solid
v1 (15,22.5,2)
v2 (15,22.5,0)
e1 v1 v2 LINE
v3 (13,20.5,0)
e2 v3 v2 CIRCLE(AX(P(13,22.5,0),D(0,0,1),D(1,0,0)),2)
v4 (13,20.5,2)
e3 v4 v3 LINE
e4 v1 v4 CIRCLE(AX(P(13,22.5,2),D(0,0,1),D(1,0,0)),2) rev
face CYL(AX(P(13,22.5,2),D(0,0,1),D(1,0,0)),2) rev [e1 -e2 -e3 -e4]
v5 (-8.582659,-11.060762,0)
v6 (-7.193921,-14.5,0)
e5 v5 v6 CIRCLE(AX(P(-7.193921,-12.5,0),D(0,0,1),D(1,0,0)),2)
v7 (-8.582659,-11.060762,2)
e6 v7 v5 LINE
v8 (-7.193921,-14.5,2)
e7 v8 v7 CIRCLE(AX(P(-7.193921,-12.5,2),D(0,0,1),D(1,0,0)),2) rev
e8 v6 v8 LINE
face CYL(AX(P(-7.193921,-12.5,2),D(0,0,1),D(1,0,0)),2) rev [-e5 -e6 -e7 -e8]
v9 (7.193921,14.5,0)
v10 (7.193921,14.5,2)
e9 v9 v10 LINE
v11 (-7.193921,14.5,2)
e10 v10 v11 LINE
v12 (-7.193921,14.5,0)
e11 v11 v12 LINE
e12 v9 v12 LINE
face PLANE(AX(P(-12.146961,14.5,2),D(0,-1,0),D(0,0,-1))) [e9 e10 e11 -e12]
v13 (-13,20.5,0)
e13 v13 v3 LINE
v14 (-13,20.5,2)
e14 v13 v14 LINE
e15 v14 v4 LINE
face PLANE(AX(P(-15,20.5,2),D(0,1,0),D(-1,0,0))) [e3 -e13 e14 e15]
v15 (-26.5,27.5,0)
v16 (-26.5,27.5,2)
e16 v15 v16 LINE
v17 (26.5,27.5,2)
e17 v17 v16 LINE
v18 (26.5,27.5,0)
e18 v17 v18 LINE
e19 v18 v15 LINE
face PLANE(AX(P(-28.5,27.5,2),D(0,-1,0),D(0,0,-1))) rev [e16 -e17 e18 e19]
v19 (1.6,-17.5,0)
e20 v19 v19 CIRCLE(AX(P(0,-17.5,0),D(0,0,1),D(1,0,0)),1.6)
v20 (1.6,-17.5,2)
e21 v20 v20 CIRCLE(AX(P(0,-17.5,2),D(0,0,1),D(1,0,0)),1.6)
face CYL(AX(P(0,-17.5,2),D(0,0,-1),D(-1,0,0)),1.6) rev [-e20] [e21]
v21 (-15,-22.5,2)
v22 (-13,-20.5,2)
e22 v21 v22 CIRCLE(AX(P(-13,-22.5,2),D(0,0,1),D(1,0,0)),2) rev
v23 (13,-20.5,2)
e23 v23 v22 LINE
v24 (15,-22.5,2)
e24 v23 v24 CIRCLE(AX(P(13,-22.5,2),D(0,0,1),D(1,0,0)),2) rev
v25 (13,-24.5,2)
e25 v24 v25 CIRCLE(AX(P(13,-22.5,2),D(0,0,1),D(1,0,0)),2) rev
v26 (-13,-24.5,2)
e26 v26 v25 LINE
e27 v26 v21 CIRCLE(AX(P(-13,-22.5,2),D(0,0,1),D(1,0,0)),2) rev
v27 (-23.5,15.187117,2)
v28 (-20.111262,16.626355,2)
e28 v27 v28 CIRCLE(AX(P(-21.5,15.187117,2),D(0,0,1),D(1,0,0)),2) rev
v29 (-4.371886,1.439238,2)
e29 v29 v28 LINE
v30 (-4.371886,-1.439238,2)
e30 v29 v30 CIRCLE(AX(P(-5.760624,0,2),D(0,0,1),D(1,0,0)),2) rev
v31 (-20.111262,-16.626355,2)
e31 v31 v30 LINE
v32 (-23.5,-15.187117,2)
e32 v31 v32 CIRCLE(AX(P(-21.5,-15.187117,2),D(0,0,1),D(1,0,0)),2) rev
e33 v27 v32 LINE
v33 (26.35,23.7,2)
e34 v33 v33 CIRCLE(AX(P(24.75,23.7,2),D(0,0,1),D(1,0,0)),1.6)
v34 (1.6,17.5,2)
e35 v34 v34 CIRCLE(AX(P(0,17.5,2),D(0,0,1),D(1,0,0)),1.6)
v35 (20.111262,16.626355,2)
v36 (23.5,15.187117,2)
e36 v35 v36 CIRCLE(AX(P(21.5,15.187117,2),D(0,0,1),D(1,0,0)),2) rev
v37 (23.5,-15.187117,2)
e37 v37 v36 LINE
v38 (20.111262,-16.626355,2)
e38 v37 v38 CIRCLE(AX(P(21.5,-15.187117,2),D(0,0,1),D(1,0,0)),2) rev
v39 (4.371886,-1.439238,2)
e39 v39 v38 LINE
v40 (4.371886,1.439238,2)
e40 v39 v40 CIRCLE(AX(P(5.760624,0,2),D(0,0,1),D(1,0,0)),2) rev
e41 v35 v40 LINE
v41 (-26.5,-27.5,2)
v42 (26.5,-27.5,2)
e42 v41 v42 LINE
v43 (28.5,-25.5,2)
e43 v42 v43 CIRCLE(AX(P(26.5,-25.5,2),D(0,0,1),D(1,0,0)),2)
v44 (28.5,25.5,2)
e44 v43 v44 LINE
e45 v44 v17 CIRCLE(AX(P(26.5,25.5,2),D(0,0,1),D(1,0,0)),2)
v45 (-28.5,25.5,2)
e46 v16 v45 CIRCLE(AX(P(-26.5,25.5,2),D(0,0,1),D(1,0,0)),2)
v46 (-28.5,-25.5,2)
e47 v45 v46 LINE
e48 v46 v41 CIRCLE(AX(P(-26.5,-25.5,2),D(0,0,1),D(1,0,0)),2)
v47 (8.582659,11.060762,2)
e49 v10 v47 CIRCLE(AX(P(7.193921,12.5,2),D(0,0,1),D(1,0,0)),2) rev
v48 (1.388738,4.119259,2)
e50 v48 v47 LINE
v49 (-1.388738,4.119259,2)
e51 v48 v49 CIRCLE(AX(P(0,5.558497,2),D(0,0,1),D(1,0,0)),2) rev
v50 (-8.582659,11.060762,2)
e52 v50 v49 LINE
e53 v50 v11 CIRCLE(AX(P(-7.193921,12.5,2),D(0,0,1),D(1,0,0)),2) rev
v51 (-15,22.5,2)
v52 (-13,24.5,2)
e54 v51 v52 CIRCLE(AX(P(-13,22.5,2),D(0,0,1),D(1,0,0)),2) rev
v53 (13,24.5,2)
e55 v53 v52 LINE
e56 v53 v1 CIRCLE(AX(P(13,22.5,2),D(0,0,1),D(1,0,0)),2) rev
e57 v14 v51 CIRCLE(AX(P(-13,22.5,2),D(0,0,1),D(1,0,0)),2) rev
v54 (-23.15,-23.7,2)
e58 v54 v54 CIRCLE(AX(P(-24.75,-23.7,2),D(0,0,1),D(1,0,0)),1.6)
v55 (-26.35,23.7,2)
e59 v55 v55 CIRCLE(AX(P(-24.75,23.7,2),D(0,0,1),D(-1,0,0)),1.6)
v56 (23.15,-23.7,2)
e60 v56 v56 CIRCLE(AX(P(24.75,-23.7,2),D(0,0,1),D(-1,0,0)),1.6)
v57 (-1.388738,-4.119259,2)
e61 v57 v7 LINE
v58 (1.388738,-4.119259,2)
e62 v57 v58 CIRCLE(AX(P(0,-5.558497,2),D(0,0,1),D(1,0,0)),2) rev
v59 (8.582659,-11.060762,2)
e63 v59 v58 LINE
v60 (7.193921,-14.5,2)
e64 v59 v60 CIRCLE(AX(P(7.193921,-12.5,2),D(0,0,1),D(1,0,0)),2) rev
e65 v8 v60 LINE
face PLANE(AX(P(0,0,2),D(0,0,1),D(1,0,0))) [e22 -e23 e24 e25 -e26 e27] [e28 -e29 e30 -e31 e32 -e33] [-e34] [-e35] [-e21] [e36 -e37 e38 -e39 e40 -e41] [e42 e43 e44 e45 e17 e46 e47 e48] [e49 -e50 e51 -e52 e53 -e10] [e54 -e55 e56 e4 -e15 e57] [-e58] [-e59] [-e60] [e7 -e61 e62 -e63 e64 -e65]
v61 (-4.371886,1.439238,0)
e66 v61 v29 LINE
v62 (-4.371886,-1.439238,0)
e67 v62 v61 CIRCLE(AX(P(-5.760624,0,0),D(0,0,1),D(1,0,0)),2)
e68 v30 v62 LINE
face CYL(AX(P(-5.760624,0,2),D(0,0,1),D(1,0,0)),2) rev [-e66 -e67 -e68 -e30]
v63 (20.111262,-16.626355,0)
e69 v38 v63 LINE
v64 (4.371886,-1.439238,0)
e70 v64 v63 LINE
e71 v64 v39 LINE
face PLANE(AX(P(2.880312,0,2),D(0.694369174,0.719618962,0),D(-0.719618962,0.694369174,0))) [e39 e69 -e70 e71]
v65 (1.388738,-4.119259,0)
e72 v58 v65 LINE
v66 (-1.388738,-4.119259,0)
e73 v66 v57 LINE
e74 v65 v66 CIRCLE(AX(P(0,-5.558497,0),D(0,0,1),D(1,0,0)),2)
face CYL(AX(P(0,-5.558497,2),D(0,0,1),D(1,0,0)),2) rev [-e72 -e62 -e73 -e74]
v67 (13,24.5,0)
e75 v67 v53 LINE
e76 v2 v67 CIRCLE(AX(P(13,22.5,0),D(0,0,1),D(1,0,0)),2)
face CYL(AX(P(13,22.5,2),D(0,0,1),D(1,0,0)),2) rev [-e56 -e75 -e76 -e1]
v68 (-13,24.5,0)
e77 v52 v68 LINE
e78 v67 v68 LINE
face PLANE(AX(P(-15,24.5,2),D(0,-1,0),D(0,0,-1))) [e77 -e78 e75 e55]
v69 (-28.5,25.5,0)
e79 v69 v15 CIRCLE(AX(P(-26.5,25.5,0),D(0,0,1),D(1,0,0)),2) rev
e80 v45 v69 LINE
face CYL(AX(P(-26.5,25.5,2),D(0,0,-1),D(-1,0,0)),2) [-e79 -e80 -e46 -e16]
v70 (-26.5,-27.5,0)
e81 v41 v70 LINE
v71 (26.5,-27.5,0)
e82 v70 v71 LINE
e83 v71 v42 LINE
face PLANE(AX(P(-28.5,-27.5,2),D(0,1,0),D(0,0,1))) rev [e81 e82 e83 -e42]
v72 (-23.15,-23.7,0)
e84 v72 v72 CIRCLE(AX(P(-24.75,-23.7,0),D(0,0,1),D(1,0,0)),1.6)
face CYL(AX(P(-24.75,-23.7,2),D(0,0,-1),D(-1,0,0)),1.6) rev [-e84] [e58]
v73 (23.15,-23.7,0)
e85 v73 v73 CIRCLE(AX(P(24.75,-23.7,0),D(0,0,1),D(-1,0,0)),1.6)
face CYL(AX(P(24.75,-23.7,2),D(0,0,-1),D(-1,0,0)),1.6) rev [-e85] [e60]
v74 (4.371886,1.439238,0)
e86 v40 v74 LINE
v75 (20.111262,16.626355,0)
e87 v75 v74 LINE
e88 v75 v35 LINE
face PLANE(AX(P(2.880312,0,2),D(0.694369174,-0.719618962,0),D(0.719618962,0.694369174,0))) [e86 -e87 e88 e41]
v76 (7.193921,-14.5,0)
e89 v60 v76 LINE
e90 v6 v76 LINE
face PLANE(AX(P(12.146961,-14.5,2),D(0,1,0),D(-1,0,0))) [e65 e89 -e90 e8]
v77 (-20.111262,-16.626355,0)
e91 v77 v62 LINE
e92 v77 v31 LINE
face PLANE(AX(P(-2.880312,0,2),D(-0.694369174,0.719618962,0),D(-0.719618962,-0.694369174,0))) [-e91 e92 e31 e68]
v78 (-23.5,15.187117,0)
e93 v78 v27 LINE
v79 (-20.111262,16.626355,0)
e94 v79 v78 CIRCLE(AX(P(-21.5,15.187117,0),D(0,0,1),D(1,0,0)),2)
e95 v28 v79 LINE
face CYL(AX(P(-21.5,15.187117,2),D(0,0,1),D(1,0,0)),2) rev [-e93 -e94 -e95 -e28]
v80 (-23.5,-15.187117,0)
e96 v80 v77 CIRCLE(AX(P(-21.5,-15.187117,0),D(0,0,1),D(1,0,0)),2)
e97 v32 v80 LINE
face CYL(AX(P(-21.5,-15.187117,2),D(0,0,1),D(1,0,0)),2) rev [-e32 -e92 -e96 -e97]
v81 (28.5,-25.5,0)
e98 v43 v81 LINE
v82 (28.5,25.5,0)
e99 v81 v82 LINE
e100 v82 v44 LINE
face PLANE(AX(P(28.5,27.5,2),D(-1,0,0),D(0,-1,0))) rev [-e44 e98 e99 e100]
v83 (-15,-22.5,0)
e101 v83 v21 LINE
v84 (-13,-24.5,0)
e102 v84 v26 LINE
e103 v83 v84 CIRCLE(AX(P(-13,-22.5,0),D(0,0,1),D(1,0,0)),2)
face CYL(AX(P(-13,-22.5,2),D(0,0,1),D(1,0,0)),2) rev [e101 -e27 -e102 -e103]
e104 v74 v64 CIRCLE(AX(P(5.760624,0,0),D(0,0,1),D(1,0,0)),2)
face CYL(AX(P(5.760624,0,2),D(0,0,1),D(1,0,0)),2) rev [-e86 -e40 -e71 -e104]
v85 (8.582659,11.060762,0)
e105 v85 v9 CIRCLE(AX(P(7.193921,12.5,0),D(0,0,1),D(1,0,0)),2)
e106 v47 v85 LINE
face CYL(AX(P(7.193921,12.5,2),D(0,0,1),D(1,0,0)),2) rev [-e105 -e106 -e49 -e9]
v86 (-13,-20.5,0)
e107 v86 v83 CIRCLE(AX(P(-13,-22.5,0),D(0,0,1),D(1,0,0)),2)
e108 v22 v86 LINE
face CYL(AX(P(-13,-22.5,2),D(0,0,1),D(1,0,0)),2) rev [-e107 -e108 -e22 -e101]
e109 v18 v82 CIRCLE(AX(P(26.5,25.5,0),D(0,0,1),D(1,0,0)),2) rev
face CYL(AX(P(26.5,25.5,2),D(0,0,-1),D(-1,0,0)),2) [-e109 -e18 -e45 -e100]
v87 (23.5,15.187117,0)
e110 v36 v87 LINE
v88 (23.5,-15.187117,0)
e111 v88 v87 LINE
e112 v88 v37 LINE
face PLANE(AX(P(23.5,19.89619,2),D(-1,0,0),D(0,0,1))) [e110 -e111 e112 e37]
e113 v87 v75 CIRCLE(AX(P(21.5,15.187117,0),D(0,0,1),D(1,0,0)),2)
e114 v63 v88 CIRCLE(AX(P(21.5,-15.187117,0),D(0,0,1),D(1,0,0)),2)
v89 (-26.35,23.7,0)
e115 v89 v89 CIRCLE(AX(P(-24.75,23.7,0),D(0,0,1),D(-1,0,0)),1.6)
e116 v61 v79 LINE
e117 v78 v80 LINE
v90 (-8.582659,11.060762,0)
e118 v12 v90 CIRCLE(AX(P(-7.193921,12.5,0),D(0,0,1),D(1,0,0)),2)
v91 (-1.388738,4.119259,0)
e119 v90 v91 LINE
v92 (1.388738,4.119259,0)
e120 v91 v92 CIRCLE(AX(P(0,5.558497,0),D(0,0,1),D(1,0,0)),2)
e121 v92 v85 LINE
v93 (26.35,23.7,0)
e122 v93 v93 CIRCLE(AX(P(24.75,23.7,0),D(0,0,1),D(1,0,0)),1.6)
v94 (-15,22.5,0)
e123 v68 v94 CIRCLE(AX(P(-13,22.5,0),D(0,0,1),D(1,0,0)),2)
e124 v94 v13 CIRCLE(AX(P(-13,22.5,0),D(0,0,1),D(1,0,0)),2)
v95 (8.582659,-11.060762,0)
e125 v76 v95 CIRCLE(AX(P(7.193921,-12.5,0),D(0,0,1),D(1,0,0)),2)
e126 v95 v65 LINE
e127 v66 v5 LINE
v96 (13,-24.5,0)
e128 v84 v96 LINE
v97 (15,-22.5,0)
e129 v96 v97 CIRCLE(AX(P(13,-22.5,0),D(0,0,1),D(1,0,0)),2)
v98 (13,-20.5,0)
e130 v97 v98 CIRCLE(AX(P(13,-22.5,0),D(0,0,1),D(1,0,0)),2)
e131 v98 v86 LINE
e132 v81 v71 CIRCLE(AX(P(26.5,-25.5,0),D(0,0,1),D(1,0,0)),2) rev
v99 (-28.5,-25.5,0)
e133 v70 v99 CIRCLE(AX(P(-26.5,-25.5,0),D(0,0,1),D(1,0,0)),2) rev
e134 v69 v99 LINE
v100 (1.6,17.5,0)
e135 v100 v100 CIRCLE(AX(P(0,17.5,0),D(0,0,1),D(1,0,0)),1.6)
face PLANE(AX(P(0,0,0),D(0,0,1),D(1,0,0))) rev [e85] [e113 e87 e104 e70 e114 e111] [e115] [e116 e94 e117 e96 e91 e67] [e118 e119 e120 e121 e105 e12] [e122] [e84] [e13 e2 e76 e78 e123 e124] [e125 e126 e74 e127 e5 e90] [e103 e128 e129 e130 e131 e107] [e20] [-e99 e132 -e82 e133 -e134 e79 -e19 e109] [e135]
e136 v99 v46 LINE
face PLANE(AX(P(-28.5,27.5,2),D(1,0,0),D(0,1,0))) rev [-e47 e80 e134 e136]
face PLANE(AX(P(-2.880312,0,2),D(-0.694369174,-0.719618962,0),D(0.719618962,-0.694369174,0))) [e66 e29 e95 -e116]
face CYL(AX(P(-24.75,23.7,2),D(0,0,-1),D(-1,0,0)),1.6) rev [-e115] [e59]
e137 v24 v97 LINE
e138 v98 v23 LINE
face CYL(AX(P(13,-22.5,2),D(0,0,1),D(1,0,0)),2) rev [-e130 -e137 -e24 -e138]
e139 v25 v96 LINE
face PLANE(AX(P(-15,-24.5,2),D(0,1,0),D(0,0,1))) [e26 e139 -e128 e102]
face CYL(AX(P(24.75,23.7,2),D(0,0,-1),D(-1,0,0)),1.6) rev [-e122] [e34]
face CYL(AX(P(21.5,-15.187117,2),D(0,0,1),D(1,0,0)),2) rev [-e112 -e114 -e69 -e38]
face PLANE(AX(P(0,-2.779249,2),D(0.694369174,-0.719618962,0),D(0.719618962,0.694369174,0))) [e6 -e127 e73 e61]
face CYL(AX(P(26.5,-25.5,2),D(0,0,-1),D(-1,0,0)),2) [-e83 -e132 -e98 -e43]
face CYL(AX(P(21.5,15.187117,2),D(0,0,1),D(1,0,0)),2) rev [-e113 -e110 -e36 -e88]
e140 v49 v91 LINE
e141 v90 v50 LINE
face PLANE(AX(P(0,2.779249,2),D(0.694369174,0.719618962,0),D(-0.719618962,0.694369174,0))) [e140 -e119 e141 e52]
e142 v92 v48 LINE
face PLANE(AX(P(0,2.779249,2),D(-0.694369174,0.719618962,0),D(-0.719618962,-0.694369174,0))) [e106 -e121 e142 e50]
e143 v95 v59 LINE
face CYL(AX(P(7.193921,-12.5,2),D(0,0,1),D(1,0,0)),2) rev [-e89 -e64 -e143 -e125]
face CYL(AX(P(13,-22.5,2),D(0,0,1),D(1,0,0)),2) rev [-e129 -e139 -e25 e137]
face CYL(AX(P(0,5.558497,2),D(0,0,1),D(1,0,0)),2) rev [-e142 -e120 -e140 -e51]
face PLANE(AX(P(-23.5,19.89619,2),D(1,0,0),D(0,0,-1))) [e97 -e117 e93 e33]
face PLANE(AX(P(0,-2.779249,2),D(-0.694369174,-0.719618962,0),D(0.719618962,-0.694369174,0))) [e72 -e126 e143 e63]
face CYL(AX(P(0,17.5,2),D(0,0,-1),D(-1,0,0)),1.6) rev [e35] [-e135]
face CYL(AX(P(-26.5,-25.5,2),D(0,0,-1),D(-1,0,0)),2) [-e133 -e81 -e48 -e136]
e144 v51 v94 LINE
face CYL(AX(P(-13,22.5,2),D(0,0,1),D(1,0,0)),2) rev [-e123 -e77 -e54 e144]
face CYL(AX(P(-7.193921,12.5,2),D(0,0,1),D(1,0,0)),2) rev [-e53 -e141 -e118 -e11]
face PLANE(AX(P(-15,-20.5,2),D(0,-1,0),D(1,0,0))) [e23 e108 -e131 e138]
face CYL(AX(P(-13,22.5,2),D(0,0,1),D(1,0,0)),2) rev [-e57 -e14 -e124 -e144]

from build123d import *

# Parameters (mm, degrees)
SKETCH_1_W      = 57
SKETCH_1_H      = 55
SKETCH_1_R      = 1.6
SKETCH_1_W_2    = 30
SKETCH_1_H_2    = 4
EXTRUDE_1_DEPTH = 2
FILLET_1_R      = 2


with BuildPart() as part:
    # 草图1 → 凸台-拉伸1 (new body)
    with BuildSketch(Plane.XY):
        Rectangle(SKETCH_1_W, SKETCH_1_H)
        with Locations((24.75, 23.7)):
            Circle(SKETCH_1_R, mode=Mode.SUBTRACT)
        with Locations(Location((-24.75, 23.7, 0), (0, 0, 180))):
            Circle(SKETCH_1_R, mode=Mode.SUBTRACT)
        with Locations(Location((24.75, -23.7, 0), (0, 0, 180))):
            Circle(SKETCH_1_R, mode=Mode.SUBTRACT)
        with Locations((-24.75, -23.7)):
            Circle(SKETCH_1_R, mode=Mode.SUBTRACT)
        with Locations((0, 17.5)):
            Circle(SKETCH_1_R, mode=Mode.SUBTRACT)
        with Locations((0, -17.5)):
            Circle(SKETCH_1_R, mode=Mode.SUBTRACT)
        Polygon((-2.880312196, 0), (-23.5, 19.896189986), (-23.5, -19.896189986), align=None, mode=Mode.SUBTRACT)
        Polygon((0, -2.77924861), (-12.146960531, -14.5), (0, -14.5), (12.146960531, -14.5), align=None, mode=Mode.SUBTRACT)
        with Locations((0, 22.5)):
            Rectangle(SKETCH_1_W_2, SKETCH_1_H_2, mode=Mode.SUBTRACT)
        Polygon((2.880312196, 0), (23.5, 19.896189986), (23.5, -19.896189986), align=None, mode=Mode.SUBTRACT)
        Polygon((0, 2.77924861), (12.146960531, 14.5), (0, 14.5), (-12.146960531, 14.5), align=None, mode=Mode.SUBTRACT)
        with Locations((0, -22.5)):
            Rectangle(SKETCH_1_W_2, SKETCH_1_H_2, mode=Mode.SUBTRACT)
    extrude(amount=EXTRUDE_1_DEPTH)

    # 圆角1
    fillet_1_edges = [part.edges().sort_by_distance(p)[0] for p in [
        (23.5, 19.896189986, 1),
        (2.880312196, 0, 1),
        (23.5, -19.896189986, 1),
        (-15, 24.5, 1),
        (-15, 20.5, 1),
        (15, 20.5, 1),
        (15, 24.5, 1),
        (12.146960531, -14.5, 1),
        (0, -2.77924861, 1),
        (-23.5, 19.896189986, 1),
        (-23.5, -19.896189986, 1),
        (-2.880312196, 0, 1),
        (-12.146960531, -14.5, 1),
        (-28.5, -27.5, 1),
        (-28.5, 27.5, 1),
        (28.5, 27.5, 1),
        (28.5, -27.5, 1),
        (12.146960531, 14.5, 1),
        (0, 2.77924861, 1),
        (-12.146960531, 14.5, 1),
        (15, -24.5, 1),
        (15, -20.5, 1),
        (-15, -24.5, 1),
        (-15, -20.5, 1),
    ]]
    fillet(fillet_1_edges, radius=FILLET_1_R - 0.0001)  # a hair under: the kernel refuses the full size


solid = part.part
